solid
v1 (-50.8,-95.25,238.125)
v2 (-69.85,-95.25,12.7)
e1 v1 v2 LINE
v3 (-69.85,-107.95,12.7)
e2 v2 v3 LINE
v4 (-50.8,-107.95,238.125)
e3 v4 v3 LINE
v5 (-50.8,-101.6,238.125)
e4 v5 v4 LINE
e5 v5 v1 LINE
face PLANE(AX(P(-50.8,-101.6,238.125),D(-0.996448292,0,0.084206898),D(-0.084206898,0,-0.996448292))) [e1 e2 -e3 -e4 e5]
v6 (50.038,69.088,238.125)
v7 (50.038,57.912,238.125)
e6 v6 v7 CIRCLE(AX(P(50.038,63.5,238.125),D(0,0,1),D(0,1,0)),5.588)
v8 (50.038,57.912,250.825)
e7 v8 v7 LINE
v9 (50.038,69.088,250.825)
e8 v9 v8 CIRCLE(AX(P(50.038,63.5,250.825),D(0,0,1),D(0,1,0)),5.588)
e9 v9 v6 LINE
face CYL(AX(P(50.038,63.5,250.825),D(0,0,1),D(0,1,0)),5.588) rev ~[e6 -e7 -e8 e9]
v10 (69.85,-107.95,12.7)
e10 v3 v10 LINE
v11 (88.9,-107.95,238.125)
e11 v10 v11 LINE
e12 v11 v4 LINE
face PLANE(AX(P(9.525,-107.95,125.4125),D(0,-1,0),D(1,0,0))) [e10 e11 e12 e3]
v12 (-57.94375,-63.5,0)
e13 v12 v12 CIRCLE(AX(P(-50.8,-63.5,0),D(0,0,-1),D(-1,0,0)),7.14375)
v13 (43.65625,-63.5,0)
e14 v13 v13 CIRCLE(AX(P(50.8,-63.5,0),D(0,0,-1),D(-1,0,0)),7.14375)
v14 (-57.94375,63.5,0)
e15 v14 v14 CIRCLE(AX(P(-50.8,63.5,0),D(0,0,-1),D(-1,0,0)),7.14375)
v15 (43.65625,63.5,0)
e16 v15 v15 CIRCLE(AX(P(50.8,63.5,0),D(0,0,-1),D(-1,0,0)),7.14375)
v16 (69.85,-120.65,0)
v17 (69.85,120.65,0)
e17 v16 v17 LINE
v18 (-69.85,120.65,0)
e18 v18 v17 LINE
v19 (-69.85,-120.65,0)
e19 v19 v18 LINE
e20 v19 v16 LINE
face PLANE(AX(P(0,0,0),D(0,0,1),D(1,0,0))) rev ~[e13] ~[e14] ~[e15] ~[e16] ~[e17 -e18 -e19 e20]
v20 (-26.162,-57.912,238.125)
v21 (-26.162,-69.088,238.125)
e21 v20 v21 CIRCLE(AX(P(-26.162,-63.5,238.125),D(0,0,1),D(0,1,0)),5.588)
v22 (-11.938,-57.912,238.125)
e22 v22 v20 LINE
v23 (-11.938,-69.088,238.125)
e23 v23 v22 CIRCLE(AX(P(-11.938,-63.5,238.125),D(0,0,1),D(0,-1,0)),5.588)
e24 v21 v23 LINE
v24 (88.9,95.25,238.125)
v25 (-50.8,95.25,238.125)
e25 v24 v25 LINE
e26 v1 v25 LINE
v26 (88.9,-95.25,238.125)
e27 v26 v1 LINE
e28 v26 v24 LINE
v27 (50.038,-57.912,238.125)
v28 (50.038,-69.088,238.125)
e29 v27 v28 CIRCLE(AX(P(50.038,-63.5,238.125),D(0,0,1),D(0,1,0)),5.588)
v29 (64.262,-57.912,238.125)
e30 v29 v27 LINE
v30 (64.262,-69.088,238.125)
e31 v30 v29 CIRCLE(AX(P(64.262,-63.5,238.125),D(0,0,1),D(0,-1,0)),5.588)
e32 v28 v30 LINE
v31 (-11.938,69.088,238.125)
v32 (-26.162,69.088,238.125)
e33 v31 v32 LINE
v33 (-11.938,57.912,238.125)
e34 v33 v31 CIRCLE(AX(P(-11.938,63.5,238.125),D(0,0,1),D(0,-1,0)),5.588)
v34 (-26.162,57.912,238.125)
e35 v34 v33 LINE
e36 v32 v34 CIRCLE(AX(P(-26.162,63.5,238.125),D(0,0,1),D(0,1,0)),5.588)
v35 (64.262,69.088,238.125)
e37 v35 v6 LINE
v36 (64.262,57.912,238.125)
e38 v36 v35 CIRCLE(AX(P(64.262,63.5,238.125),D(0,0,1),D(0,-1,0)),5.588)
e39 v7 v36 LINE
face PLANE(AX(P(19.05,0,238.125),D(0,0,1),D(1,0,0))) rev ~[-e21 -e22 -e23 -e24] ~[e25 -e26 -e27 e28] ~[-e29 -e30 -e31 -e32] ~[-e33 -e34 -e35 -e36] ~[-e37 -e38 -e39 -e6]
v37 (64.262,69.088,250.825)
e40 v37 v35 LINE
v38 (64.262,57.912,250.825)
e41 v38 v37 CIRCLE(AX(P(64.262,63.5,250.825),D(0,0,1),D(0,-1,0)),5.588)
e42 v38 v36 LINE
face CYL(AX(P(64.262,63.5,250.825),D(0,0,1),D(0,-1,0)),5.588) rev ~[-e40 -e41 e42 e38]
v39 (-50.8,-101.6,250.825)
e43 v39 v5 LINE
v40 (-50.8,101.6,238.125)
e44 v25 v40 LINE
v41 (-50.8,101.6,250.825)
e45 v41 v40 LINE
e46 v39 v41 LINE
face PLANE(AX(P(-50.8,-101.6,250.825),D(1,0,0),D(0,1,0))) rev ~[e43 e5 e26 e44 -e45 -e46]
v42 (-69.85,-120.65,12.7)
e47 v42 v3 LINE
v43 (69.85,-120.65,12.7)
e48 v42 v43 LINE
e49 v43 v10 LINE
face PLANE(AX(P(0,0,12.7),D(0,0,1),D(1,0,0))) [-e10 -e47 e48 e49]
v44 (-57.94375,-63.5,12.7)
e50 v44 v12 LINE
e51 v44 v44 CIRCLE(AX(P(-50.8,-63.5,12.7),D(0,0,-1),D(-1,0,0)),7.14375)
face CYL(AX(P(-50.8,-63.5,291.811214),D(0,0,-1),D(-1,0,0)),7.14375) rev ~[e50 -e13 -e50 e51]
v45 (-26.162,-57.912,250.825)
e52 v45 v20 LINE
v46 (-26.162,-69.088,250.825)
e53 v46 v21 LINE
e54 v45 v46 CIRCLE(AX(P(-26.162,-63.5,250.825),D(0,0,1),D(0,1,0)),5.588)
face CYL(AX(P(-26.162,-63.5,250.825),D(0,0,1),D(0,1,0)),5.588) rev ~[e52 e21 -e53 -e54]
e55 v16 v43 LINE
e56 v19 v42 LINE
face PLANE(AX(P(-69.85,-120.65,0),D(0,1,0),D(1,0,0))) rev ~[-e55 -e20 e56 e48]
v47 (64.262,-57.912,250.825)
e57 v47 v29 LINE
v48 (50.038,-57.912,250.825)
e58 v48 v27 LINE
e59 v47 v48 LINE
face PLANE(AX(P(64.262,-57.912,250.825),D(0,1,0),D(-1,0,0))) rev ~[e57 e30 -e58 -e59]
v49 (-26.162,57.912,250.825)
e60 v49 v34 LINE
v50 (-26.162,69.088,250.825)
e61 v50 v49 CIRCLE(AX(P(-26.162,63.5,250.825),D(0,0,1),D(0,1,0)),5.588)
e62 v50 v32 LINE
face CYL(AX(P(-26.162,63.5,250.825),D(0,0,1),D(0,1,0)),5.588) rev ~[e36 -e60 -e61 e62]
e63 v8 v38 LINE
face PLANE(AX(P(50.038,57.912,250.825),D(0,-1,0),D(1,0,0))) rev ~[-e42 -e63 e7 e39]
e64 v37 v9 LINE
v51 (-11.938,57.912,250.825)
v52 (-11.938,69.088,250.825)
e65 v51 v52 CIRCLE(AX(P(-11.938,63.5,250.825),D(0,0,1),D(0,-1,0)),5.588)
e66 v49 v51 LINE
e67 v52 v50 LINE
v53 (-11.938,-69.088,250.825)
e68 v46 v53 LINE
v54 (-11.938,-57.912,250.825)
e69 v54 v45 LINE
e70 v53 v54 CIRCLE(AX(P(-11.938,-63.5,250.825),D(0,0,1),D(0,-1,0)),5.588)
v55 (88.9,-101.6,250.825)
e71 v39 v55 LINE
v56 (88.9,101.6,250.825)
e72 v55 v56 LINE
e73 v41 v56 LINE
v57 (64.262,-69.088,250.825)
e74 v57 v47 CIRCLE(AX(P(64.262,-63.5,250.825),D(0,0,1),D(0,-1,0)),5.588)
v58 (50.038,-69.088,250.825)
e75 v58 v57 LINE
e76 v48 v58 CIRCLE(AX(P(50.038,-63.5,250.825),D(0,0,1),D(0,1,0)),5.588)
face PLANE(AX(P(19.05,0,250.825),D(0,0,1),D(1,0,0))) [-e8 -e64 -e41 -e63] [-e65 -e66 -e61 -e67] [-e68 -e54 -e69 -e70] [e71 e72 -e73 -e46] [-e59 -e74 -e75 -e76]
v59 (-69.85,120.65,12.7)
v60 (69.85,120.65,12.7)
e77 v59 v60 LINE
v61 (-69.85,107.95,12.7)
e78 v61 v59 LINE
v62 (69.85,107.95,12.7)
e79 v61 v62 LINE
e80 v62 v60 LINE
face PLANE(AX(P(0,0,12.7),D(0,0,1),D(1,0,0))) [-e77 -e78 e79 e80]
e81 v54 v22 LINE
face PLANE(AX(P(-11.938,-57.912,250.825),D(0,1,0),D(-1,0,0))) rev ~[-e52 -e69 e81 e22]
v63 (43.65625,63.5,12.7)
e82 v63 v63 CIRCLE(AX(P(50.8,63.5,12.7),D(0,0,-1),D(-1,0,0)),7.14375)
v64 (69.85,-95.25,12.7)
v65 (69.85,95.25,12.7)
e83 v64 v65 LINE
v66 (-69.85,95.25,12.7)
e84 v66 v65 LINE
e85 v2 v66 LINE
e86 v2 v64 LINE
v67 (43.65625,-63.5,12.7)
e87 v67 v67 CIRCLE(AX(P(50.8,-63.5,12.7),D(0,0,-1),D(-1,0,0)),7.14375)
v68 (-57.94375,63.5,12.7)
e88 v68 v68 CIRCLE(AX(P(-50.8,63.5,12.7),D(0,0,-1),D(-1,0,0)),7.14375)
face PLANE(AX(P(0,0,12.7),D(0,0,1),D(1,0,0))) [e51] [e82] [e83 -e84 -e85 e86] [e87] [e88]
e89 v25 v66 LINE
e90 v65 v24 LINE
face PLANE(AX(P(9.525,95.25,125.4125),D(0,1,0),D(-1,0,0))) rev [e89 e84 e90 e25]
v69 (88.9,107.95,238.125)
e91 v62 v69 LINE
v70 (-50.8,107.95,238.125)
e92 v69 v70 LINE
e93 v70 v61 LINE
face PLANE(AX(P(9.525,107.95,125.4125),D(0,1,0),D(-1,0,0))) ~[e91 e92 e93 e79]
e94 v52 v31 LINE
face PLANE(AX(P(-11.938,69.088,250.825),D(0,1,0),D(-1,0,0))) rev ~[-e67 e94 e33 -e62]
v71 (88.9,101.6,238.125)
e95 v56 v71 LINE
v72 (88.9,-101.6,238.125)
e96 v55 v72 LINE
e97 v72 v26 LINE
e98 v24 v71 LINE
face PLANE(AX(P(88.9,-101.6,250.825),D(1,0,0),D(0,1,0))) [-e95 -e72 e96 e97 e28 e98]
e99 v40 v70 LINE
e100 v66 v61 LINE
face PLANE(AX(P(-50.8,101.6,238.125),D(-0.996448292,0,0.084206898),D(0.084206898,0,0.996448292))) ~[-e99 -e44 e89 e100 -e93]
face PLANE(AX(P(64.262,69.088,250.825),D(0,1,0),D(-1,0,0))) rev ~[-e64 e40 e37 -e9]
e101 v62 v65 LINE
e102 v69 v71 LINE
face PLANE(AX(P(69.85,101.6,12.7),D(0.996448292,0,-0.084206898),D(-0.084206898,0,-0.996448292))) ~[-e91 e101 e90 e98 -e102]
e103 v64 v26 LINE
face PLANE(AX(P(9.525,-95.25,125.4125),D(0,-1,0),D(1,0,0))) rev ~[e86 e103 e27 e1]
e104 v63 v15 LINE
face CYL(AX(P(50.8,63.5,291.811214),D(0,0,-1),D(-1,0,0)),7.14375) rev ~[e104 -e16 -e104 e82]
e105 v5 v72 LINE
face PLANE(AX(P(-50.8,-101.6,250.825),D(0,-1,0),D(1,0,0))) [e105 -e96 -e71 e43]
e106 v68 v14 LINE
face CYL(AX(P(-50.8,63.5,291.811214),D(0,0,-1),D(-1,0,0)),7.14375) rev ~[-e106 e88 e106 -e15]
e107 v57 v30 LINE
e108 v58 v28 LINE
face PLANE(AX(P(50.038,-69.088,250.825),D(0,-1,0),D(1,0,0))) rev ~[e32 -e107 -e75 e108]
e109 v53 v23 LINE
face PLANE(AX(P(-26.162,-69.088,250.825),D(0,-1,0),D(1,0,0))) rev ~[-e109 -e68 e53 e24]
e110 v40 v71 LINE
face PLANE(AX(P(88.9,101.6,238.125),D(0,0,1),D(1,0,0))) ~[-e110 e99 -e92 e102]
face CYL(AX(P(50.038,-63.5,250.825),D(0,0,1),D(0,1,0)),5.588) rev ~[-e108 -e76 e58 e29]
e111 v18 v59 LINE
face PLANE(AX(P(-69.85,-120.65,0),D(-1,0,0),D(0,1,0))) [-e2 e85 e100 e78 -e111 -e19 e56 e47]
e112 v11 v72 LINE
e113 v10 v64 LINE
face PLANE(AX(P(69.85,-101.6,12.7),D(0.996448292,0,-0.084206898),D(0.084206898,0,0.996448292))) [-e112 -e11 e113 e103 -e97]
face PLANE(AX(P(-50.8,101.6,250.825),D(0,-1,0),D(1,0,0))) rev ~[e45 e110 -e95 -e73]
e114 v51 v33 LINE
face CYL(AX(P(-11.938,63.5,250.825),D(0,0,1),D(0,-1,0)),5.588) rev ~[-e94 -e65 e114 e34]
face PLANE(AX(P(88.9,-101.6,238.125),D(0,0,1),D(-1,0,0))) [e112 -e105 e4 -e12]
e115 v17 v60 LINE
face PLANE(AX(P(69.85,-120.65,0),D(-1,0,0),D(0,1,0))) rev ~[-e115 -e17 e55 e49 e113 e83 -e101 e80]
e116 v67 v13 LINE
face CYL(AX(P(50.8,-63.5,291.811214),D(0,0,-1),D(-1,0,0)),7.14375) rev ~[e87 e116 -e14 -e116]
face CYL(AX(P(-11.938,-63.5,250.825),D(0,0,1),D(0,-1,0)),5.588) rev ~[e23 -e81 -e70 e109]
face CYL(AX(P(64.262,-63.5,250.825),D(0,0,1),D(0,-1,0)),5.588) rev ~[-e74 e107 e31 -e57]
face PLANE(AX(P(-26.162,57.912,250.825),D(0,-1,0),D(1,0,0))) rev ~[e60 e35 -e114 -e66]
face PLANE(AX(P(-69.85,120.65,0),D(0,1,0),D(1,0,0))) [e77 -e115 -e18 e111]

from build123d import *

# Parameters (mm, degrees)
F1_W      = 139.7
F1_H      = 241.3
F2_DEPTH  = 12.7
F4_D      = 14.2875
F5_W      = 139.7
F5_H      = 203.2
F6_DEPTH  = 12.7
F8_DEPTH  = 25.4
F10_DEPTH = 6.35


# Not quite as in the source:
# - a length typed as a fraction of an inch, garbled in the dataset ("3 / 203.2 mm" for 3/8 in), is restored


with BuildPart() as f2:
    # F1 (on Top) → F2 (new body)
    with BuildSketch(Plane.XY):
        Rectangle(F1_W, F1_H)
    extrude(amount=F2_DEPTH)

    # F4 (through all)
    with Locations(Plane.XY.offset(12.7)):
        with Locations((-50.8, 63.5), (50.8, 63.5), (50.8, -63.5), (-50.8, -63.5)):
            Hole(F4_D / 2)



with BuildPart() as f6:
    # F5 (on offset) → F6 (new body)
    with BuildSketch(Plane.XY.offset(250.825)):
        with Locations((19.05, 0)):
            Rectangle(F5_W, F5_H)
    extrude(amount=-F6_DEPTH)

    # F7 (on face) → F8 (cut)
    with BuildSketch(Plane.XY.offset(250.825)):
        with BuildLine():
            ThreePointArc((-26.162, -57.912), (-31.75, -63.5), (-26.162, -69.088))
            Line((-26.162, -69.088), (-11.938, -69.088))
            ThreePointArc((-11.938, -69.088), (-6.35, -63.5), (-11.938, -57.912))
            Line((-11.938, -57.912), (-26.162, -57.912))
        make_face()
        with BuildLine():
            Line((50.038, -69.088), (64.262, -69.088))
            ThreePointArc((64.262, -69.088), (69.85, -63.5), (64.262, -57.912))
            Line((64.262, -57.912), (50.038, -57.912))
            ThreePointArc((50.038, -57.912), (44.45, -63.5), (50.038, -69.088))
        make_face()
        with BuildLine():
            ThreePointArc((64.262, 57.912), (69.85, 63.5), (64.262, 69.088))
            Line((64.262, 69.088), (50.038, 69.088))
            ThreePointArc((50.038, 69.088), (44.45, 63.5), (50.038, 57.912))
            Line((50.038, 57.912), (64.262, 57.912))
        make_face()
        with BuildLine():
            Line((-11.938, 69.088), (-26.162, 69.088))
            ThreePointArc((-26.162, 69.088), (-31.75, 63.5), (-26.162, 57.912))
            Line((-26.162, 57.912), (-11.938, 57.912))
            ThreePointArc((-11.938, 57.912), (-6.35, 63.5), (-11.938, 69.088))
        make_face()
    extrude(amount=-F8_DEPTH, mode=Mode.SUBTRACT)


with BuildPart() as f2_1:
    add(f2.part)

    add(f6.part)  # F10 merges F6
    # F9 (on face) → F10 (join, symmetric)
    with BuildSketch(Plane.XZ.offset(101.6)):
        Polygon((88.9, 238.125), (-50.8, 238.125), (-69.85, 12.7), (69.85, 12.7), align=None)
    extrude(amount=F10_DEPTH, both=True)

    # F11: F2 across plane


with BuildPart() as f2_2:
    add(f2_1.part)
    add(f2_1.part.mirror(Plane.XZ))


solid = f2_2.part
